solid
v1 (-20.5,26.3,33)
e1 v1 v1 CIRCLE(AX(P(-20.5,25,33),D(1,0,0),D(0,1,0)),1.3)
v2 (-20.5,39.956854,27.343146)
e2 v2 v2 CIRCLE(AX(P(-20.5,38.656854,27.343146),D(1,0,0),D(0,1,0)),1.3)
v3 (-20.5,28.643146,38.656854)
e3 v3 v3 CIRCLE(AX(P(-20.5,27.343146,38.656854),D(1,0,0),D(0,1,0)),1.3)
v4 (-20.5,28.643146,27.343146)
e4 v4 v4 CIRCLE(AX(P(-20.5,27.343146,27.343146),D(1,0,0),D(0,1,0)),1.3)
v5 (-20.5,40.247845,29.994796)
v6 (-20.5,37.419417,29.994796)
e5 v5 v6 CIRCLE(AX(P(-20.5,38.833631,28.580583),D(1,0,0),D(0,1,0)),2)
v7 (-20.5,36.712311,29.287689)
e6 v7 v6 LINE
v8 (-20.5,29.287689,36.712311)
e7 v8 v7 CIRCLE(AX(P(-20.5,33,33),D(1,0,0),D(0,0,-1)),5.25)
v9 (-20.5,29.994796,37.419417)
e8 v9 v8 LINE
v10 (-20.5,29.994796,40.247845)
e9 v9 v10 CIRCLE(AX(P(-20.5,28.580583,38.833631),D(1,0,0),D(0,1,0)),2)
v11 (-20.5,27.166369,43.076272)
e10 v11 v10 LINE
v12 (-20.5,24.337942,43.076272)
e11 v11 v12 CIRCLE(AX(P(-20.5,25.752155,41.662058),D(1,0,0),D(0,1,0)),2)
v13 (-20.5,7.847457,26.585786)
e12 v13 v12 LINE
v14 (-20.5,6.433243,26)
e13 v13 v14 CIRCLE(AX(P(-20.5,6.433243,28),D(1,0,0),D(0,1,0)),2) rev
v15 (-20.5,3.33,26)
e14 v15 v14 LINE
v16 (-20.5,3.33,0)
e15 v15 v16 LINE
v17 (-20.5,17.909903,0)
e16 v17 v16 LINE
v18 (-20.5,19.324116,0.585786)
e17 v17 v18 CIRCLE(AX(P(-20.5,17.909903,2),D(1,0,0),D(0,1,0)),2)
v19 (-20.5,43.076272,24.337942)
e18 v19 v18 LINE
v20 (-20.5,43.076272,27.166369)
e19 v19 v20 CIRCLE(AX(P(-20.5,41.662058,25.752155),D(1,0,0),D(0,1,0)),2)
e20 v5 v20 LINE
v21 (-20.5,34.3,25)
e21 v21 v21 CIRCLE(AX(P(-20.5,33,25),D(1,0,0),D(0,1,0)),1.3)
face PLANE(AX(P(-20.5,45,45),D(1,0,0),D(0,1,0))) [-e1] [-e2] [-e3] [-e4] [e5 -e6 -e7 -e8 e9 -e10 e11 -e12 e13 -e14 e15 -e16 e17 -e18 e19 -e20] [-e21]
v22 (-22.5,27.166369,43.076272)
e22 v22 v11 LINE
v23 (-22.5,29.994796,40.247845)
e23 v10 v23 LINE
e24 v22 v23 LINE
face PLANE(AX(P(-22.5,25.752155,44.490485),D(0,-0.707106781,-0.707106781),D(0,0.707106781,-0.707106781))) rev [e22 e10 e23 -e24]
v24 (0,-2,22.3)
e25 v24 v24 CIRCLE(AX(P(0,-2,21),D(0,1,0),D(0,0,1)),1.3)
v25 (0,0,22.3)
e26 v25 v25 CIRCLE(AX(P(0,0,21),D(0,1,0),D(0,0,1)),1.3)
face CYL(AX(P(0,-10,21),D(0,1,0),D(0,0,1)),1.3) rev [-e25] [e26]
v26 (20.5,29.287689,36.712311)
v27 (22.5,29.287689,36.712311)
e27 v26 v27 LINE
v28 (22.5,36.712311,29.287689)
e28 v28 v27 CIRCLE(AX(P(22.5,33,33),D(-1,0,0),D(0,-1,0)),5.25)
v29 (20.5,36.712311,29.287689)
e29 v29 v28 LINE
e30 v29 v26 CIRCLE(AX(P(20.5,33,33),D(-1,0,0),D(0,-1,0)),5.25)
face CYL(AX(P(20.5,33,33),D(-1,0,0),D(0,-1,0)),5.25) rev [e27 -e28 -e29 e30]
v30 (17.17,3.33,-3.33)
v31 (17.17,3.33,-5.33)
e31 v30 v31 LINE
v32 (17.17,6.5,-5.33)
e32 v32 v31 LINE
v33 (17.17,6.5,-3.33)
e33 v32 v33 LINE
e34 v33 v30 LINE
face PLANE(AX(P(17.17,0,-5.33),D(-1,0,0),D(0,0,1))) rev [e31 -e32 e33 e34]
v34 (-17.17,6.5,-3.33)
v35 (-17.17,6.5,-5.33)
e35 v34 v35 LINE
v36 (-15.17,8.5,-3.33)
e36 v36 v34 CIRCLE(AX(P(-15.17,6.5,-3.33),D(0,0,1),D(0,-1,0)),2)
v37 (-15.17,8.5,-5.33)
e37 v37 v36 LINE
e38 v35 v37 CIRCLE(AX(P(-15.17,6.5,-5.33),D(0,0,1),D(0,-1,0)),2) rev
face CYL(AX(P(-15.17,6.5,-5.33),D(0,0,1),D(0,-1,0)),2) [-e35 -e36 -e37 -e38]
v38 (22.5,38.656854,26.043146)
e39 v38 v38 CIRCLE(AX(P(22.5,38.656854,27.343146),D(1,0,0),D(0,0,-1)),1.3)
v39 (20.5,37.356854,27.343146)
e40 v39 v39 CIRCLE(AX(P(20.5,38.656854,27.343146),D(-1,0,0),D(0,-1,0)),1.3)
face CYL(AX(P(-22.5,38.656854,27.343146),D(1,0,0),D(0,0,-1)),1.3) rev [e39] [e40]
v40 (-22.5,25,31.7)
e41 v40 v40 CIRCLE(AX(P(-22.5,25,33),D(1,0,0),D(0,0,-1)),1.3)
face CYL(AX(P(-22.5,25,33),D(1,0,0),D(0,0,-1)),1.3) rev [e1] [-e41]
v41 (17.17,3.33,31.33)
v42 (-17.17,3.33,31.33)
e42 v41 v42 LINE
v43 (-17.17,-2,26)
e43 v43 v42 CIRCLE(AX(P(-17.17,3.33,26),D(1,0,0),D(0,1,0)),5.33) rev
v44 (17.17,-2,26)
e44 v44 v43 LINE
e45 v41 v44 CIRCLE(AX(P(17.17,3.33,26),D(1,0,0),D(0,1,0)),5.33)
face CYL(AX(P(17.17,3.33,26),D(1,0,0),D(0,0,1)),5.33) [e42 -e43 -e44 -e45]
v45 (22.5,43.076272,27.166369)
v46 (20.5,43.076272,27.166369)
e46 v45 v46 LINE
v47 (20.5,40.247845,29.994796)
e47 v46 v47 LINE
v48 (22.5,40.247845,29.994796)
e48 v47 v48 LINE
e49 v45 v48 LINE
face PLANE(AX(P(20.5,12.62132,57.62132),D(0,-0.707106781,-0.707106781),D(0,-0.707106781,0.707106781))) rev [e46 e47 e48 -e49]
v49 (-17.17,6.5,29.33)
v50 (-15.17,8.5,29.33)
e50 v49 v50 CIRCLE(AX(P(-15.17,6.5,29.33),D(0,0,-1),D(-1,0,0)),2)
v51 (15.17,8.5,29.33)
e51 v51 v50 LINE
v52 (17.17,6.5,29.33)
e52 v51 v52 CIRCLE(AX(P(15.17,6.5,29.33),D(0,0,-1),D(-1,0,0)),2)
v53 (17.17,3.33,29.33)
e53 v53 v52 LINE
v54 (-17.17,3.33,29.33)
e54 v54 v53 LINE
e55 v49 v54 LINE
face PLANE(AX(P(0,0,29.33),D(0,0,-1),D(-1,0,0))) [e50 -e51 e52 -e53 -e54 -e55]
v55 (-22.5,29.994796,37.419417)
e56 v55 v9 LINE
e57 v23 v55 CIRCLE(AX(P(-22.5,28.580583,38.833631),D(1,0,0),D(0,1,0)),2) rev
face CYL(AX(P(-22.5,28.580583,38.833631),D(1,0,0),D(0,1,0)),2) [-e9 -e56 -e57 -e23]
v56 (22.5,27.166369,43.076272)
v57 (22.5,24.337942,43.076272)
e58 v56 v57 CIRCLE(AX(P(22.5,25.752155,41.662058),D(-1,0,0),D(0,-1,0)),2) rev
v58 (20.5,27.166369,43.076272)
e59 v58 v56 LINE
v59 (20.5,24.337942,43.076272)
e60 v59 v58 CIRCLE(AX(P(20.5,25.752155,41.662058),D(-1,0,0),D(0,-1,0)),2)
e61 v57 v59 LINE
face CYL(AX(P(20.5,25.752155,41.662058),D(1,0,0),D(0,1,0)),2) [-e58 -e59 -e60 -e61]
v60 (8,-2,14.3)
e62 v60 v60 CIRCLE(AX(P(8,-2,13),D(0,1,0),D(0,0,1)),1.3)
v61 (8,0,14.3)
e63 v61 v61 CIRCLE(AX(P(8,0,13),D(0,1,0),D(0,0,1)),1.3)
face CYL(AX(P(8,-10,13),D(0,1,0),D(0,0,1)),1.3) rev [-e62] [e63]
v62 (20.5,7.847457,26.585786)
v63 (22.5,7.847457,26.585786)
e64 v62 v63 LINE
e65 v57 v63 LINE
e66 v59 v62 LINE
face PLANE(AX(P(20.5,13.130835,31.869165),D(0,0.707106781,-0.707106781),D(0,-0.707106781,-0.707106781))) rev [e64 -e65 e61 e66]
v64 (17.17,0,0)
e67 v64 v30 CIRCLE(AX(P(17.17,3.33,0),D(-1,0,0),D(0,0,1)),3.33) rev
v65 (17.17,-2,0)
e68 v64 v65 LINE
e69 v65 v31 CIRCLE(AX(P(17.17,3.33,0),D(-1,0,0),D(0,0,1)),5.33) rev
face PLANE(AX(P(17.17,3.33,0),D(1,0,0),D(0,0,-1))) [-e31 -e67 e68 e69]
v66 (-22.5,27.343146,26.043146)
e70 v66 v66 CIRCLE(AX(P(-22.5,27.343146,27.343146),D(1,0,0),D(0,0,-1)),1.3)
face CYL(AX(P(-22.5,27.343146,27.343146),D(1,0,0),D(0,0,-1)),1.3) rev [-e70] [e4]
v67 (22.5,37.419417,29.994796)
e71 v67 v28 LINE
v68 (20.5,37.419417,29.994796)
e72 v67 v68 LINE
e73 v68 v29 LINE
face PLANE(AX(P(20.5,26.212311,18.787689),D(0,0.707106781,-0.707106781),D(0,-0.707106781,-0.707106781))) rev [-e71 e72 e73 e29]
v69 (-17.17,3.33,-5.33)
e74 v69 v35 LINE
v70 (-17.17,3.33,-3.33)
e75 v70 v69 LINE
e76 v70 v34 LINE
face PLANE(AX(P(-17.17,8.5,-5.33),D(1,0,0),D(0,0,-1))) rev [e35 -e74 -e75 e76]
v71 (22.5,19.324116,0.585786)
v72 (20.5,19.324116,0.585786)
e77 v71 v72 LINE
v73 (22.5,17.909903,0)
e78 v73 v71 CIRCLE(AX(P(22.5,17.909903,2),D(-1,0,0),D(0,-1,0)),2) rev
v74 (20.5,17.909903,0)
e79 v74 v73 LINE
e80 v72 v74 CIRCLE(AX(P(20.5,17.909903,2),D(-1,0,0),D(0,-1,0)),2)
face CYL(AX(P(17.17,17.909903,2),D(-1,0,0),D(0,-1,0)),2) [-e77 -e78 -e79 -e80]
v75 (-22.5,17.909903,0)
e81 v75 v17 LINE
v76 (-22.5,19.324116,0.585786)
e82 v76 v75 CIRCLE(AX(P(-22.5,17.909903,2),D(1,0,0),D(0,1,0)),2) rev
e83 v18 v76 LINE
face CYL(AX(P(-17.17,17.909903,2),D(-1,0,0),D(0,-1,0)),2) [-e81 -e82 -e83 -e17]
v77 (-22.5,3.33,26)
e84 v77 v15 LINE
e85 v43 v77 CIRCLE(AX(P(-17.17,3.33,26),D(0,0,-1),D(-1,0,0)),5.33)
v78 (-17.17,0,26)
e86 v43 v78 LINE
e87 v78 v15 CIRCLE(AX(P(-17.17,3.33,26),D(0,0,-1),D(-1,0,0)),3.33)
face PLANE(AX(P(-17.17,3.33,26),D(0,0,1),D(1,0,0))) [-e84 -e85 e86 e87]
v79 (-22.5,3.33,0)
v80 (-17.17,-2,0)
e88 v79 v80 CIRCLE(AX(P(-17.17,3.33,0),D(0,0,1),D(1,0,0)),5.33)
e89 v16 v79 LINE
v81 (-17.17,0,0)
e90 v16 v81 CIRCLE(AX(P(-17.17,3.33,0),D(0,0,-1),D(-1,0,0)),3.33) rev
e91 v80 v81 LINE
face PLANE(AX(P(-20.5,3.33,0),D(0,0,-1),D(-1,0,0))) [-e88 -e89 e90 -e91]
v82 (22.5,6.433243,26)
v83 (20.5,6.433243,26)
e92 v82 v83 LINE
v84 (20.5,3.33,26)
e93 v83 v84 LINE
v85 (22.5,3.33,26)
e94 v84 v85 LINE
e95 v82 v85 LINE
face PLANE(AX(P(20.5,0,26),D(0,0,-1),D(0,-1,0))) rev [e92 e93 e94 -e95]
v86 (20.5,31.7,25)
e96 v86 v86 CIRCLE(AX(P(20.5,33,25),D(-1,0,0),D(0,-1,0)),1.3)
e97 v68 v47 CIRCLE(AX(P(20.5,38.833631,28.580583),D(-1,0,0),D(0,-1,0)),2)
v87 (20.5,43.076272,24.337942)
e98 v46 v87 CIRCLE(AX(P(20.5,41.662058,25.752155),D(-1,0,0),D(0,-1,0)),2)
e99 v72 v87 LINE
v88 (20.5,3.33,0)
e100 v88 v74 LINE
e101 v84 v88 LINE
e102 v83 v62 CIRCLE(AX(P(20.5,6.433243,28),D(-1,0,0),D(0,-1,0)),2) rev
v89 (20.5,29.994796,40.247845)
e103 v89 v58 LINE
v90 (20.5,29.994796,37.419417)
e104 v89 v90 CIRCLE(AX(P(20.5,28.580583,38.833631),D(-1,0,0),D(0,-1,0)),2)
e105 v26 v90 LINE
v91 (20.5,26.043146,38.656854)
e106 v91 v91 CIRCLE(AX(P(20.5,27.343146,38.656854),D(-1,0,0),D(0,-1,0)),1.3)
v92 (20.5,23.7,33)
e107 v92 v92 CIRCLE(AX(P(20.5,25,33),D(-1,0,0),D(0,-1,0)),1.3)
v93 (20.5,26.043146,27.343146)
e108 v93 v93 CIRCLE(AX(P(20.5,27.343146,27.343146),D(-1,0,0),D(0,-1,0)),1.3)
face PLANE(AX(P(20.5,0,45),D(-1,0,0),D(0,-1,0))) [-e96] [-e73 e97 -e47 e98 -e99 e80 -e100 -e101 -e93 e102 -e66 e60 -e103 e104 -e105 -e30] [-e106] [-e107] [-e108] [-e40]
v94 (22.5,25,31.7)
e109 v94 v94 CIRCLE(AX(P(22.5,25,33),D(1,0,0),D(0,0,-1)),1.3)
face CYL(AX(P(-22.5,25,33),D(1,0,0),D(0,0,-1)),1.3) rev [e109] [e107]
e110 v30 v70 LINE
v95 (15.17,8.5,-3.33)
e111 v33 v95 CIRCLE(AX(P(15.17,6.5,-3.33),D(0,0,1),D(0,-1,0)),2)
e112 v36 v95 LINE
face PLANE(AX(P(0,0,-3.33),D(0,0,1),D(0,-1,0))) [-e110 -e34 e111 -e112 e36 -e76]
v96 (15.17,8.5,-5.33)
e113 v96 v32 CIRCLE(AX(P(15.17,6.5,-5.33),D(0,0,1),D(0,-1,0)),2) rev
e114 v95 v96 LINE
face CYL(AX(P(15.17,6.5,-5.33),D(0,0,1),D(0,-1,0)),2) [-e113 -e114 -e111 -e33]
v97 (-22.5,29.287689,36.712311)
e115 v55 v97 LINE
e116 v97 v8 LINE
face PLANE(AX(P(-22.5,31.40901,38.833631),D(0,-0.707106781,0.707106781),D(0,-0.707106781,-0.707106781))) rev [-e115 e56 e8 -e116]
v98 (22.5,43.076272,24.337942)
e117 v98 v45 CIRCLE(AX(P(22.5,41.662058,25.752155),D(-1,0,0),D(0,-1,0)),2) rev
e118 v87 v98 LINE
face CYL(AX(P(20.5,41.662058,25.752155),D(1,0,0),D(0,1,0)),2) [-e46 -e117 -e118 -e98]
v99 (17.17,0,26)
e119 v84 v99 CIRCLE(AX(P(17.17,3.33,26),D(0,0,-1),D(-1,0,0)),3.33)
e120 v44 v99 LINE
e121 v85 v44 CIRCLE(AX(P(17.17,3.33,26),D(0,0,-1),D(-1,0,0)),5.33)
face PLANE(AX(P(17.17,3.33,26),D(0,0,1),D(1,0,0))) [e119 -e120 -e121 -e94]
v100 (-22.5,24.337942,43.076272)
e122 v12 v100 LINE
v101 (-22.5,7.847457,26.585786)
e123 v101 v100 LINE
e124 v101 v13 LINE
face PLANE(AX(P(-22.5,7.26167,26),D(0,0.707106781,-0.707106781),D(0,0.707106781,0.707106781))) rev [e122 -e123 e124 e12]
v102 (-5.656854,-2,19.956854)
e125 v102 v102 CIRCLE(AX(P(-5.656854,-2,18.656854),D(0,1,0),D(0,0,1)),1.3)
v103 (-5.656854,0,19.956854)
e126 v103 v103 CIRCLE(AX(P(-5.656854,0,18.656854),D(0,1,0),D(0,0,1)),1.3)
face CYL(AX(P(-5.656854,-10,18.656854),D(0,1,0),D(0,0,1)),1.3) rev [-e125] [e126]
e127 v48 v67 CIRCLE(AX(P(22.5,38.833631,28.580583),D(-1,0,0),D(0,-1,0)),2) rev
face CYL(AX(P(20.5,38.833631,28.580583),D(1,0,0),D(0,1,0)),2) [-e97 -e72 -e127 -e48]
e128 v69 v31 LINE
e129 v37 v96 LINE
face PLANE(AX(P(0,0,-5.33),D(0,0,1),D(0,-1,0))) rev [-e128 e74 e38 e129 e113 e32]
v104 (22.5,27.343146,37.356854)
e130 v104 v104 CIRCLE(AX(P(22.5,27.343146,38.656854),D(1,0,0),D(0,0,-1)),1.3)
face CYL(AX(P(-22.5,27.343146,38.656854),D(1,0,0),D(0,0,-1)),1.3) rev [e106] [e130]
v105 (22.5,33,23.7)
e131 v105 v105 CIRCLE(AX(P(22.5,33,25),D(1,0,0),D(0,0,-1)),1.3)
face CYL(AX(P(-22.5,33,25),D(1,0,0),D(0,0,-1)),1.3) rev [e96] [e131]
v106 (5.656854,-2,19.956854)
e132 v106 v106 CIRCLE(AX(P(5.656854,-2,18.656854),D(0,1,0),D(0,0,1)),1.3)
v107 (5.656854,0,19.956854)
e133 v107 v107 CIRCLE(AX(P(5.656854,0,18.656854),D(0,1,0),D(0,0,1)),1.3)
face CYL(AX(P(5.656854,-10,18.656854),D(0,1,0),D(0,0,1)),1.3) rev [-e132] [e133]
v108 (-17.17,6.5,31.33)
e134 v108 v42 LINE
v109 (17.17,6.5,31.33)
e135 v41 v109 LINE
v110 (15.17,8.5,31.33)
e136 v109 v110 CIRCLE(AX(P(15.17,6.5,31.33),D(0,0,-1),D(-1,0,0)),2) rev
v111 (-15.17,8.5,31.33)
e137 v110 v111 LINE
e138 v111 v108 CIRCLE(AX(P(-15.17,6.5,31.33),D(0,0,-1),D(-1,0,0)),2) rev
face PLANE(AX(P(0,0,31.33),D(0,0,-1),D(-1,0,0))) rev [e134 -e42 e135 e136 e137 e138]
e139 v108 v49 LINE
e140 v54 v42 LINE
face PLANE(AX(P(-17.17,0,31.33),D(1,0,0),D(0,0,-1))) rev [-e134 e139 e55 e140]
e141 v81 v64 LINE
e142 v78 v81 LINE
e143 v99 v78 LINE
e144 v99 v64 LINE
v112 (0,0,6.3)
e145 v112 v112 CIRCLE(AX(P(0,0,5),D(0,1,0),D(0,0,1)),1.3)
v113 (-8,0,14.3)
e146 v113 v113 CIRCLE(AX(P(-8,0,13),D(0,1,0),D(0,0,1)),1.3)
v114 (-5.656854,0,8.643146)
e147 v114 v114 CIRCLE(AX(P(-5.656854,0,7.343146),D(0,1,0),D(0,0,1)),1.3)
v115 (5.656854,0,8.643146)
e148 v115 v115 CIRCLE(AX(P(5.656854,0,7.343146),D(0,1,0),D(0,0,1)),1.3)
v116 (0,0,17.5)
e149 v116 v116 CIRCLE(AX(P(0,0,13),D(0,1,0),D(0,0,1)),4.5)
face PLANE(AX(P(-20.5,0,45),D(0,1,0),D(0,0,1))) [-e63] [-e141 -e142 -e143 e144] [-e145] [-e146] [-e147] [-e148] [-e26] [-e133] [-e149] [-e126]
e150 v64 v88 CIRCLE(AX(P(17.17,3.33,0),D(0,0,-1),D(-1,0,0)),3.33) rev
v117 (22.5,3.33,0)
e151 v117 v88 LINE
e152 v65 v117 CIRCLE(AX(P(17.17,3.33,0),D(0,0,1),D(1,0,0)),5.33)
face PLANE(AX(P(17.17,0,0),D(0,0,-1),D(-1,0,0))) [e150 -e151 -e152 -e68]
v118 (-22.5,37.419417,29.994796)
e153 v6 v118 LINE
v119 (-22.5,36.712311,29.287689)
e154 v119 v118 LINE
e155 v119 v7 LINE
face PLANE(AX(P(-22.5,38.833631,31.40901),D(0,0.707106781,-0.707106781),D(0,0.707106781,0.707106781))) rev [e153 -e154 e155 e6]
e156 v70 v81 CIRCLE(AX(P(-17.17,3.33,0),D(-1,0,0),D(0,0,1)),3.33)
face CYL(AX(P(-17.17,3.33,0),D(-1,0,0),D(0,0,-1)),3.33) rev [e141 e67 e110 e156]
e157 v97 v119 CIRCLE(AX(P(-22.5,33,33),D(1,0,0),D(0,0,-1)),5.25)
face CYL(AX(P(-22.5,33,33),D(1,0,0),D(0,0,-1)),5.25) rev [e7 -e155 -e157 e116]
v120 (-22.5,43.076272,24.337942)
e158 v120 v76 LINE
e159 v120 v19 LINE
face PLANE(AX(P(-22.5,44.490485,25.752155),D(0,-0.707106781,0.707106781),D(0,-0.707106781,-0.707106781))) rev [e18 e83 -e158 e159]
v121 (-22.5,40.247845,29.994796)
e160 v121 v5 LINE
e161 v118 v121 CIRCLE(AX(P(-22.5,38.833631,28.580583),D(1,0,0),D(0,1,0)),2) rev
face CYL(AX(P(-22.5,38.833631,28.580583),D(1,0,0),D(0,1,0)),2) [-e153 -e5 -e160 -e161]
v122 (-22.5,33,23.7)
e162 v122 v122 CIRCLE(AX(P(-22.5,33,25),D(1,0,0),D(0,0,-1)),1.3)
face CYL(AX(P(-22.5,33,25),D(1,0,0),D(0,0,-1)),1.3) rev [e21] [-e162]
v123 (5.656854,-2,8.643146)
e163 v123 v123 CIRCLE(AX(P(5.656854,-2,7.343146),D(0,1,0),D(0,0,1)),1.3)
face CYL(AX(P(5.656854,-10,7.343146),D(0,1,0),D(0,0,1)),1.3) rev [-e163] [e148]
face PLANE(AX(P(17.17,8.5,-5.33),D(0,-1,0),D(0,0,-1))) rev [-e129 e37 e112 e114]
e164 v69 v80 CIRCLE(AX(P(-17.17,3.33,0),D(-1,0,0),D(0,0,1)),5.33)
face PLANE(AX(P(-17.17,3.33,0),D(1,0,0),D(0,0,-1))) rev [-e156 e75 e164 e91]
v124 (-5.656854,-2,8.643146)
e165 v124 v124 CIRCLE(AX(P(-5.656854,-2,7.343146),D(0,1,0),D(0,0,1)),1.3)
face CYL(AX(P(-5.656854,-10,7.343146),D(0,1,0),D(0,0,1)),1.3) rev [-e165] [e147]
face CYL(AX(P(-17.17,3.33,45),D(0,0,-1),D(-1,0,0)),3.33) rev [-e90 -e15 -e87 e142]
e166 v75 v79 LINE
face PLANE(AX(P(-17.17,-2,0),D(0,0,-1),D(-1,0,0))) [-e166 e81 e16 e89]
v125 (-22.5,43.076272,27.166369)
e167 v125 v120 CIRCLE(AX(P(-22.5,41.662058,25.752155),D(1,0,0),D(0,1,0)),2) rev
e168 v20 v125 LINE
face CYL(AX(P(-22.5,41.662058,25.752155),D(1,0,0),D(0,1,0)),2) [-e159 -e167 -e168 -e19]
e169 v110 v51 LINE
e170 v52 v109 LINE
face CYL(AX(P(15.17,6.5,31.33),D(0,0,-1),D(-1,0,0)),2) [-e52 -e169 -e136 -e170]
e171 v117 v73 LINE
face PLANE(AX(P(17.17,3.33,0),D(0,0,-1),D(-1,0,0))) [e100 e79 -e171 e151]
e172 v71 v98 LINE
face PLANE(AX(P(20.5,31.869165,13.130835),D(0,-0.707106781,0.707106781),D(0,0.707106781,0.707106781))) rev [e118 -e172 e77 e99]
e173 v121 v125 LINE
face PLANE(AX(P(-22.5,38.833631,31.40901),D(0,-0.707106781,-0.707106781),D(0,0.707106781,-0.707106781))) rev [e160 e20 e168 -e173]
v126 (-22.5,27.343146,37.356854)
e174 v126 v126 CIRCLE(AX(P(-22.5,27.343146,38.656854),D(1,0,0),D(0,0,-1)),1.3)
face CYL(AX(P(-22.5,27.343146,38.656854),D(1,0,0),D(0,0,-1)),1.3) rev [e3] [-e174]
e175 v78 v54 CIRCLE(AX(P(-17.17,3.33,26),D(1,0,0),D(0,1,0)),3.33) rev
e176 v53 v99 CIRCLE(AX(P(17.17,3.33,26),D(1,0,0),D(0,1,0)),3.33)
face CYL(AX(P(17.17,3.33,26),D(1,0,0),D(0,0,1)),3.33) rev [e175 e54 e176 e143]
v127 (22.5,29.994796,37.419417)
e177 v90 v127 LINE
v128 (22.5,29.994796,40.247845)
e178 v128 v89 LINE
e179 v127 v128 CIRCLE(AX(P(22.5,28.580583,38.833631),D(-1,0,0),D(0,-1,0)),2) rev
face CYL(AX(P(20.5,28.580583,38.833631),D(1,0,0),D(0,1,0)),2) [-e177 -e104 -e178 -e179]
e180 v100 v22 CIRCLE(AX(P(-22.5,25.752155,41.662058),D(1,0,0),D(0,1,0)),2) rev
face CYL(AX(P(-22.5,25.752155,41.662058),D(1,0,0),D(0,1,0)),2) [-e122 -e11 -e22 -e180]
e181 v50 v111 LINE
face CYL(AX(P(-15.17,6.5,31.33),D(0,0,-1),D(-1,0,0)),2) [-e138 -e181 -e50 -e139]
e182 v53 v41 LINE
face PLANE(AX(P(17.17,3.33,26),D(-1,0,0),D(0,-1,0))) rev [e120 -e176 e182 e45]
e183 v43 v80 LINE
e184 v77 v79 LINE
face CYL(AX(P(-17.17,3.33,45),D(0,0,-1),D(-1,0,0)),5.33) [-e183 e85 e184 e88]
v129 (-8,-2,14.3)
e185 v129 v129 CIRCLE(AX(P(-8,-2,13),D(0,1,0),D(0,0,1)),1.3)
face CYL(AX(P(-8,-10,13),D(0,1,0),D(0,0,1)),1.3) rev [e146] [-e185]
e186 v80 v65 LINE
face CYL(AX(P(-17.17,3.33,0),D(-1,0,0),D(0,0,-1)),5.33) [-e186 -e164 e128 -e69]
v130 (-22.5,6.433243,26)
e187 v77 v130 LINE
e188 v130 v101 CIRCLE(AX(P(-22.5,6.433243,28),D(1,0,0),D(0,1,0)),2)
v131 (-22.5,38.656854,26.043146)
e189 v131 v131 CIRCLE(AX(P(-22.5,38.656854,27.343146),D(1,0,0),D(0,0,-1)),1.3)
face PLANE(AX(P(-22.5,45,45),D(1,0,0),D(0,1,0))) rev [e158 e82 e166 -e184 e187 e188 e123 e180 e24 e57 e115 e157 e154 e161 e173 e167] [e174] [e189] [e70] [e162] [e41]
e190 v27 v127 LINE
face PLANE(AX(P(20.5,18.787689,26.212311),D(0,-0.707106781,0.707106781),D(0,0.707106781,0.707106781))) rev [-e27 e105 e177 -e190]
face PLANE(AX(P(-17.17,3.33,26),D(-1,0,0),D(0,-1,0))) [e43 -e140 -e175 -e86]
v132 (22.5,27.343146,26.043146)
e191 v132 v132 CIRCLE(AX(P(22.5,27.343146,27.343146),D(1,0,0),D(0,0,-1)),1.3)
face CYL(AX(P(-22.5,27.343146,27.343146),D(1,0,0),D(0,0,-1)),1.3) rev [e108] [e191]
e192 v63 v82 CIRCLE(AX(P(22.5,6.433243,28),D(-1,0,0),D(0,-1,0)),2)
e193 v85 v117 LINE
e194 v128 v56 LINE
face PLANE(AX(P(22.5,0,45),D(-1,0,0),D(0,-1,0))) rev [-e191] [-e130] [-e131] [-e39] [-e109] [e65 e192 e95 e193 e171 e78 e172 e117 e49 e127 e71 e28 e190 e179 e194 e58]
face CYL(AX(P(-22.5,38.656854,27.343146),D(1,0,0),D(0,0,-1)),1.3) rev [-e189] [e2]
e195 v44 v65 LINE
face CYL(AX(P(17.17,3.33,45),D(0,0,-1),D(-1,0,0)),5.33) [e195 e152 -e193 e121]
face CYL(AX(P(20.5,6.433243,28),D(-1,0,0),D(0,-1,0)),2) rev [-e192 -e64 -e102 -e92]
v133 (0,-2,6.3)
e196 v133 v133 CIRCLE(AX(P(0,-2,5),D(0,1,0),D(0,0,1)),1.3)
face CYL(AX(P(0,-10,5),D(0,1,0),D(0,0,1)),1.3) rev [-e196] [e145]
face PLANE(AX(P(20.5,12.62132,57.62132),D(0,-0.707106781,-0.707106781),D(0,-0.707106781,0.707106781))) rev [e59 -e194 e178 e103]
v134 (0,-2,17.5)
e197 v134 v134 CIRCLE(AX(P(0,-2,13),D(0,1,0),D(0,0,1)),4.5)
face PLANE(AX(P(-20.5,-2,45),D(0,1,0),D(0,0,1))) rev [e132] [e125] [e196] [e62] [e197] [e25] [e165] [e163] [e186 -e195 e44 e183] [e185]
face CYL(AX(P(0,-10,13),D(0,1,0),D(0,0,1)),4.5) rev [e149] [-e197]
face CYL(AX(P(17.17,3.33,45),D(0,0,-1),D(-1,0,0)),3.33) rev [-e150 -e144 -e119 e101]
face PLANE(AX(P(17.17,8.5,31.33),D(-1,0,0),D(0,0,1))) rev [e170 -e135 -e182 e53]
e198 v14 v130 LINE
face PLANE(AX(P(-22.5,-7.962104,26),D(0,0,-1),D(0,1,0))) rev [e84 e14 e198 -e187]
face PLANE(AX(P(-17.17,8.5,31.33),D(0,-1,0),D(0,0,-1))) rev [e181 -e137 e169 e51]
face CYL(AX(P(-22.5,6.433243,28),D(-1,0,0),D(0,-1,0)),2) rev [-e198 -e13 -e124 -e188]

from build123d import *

# Parameters (mm, degrees)
BASE_FLANGE1_DEPTH      = 45
SKETCH5_R               = 4.5
SKETCH5_R_2             = 1.3
CUT_EXTRUDE1_DEPTH      = 10
CUT_EXTRUDE5_DEPTH      = 68.5
CUT_EXTRUDE5_DEPTH_BACK = 68.5
CUT_EXTRUDE6_DEPTH      = 67.821078603
CUT_EXTRUDE6_DEPTH_BACK = 67.821078603
SKETCH9_R               = 1.3
FILLET1_R               = 2
EDGE_FLANGE2_DEPTH      = 34.34
EDGE_FLANGE3_DEPTH      = 34.34
FILLET2_R               = 2


# Sheet-metal steps are written as plain solids
with BuildPart() as part:
    # Sketch1 → Base-Flange1 (new body)
    with BuildSketch(Plane.XY):
        with BuildLine():
            Line((-20.5, 45), (-20.5, 3.33))
            ThreePointArc((-20.5, 3.33), (-19.524665581, 0.975334419), (-17.17, 0))
            Line((-17.17, 0), (17.17, 0))
            ThreePointArc((17.17, 0), (19.524665581, 0.975334419), (20.5, 3.33))
            Line((20.5, 3.33), (20.5, 45))
            Line((20.5, 45), (22.5, 45))
            Line((22.5, 45), (22.5, 3.33))
            ThreePointArc((22.5, 3.33), (20.938879144, -0.438879144), (17.17, -2))
            Line((17.17, -2), (-17.17, -2))
            ThreePointArc((-17.17, -2), (-20.938879144, -0.438879144), (-22.5, 3.33))
            Line((-22.5, 3.33), (-22.5, 45))
            Line((-22.5, 45), (-20.5, 45))
        make_face()
    extrude(amount=BASE_FLANGE1_DEPTH)

    # Sketch5 → Cut-Extrude1 (cut)
    with BuildSketch(Plane(origin=(0, 0, 0), x_dir=(-1, 0, 0), z_dir=(0, 1, 0))):
        with Locations(Location((0, 13, 0), (0, 0, 90))):
            Circle(SKETCH5_R)
        with Locations(Location((0, 5, 0), (0, 0, 90))):
            Circle(SKETCH5_R_2)
        with Locations(Location((-5.656854249, 7.343145751, 0), (0, 0, 90))):
            Circle(SKETCH5_R_2)
        with Locations(Location((-8, 13, 0), (0, 0, 90))):
            Circle(SKETCH5_R_2)
        with Locations(Location((-5.656854249, 18.656854249, 0), (0, 0, 90))):
            Circle(SKETCH5_R_2)
        with Locations(Location((0, 21, 0), (0, 0, 90))):
            Circle(SKETCH5_R_2)
        with Locations(Location((5.656854249, 18.656854249, 0), (0, 0, 90))):
            Circle(SKETCH5_R_2)
        with Locations(Location((8, 13, 0), (0, 0, 90))):
            Circle(SKETCH5_R_2)
        with Locations(Location((5.656854249, 7.343145751, 0), (0, 0, 90))):
            Circle(SKETCH5_R_2)
    extrude(amount=-CUT_EXTRUDE1_DEPTH, mode=Mode.SUBTRACT)

    # Sketch8 → Cut-Extrude5 (cut, two sides: drawn at the far end of the back side and taken through both)
    with BuildSketch(Plane(origin=(0, 0, 0), x_dir=(0, 0, -1), z_dir=(1, 0, 0)).offset(-CUT_EXTRUDE5_DEPTH_BACK)):
        with BuildLine():
            Line((-44.490485194, 25.752155493), (-38.833630945, 31.409009742))
            Line((-38.833630945, 31.409009742), (-36.712310601, 29.287689399))
            ThreePointArc((-36.712310601, 29.287689399), (-29.287689399, 29.287689399), (-29.287689399, 36.712310601))
            Line((-29.287689399, 36.712310601), (-31.409009742, 38.833630945))
            Line((-31.409009742, 38.833630945), (-25.752155493, 44.490485194))
            Line((-25.752155493, 44.490485194), (0, 18.738329701))
            Line((0, 18.738329701), (0, 54.044936655))
            Line((0, 54.044936655), (-47.344215892, 54.044936655))
            Line((-47.344215892, 54.044936655), (-47.344215892, -7.96210432))
            Line((-47.344215892, -7.96210432), (-26, -7.96210432))
            Line((-26, -7.96210432), (-26, 7.261670299))
            Line((-26, 7.261670299), (-44.490485194, 25.752155493))
        make_face()
    extrude(amount=CUT_EXTRUDE5_DEPTH + CUT_EXTRUDE5_DEPTH_BACK, mode=Mode.SUBTRACT)

    # Sketch9 → Cut-Extrude6 (cut, two sides: drawn at the far end of the back side and taken through both)
    with BuildSketch(Plane(origin=(0, 0, 0), x_dir=(0, 0, -1), z_dir=(1, 0, 0)).offset(-CUT_EXTRUDE6_DEPTH_BACK)):
        with Locations((-38.656854249, 27.343145751)):
            Circle(SKETCH9_R)
        with Locations((-41, 33)):
            Circle(SKETCH9_R)
        with Locations((-38.656854249, 38.656854249)):
            Circle(SKETCH9_R)
        with Locations((-33, 41)):
            Circle(SKETCH9_R)
        with Locations((-27.343145751, 38.656854249)):
            Circle(SKETCH9_R)
        with Locations((-25, 33)):
            Circle(SKETCH9_R)
        with Locations((-27.343145751, 27.343145751)):
            Circle(SKETCH9_R)
        with Locations((-33, 25)):
            Circle(SKETCH9_R)
    extrude(amount=CUT_EXTRUDE6_DEPTH + CUT_EXTRUDE6_DEPTH_BACK, mode=Mode.SUBTRACT)

    # Fillet1
    fillet1_edges = [part.edges().sort_by_distance(p)[0] for p in [
        (21.5, 18.738329701, 0),
        (21.5, 44.490485194, 25.752155493),
        (21.5, 38.833630945, 31.409009742),
        (21.5, 31.409009742, 38.833630945),
        (21.5, 25.752155493, 44.490485194),
        (21.5, 7.261670299, 26),
        (-21.5, 18.738329701, 0),
        (-21.5, 44.490485194, 25.752155493),
        (-21.5, 38.833630945, 31.409009742),
        (-21.5, 31.409009742, 38.833630945),
        (-21.5, 25.752155493, 44.490485194),
        (-21.5, 7.261670299, 26),
    ]]
    fillet(fillet1_edges, radius=FILLET1_R)

    # Edge-Flange2 section (across the edge) → Edge-Flange2 (add)
    with BuildSketch(Plane(origin=(-17.17, 0, 29.33), x_dir=(0, 0, -1), z_dir=(1, 0, 0))):
        with BuildLine():
            Line((-2, 3.33), (-2, 8.5))
            Line((-2, 8.5), (0, 8.5))
            Line((0, 8.5), (0, 3.33))
            ThreePointArc((0, 3.33), (0.975334419, 0.975334419), (3.33, 0))
            Line((3.33, 0), (3.33, -2))
            ThreePointArc((3.33, -2), (-0.438879144, -0.438879144), (-2, 3.33))
        make_face()
    extrude(amount=EDGE_FLANGE2_DEPTH)

    # Edge-Flange3 section (across the edge) → Edge-Flange3 (add)
    with BuildSketch(Plane(origin=(17.17, 0, -3.33), x_dir=(0, 0, 1), z_dir=(-1, 0, 0))):
        with BuildLine():
            Line((-2, 3.33), (-2, 8.5))
            Line((-2, 8.5), (0, 8.5))
            Line((0, 8.5), (0, 3.33))
            ThreePointArc((0, 3.33), (0.975334419, 0.975334419), (3.33, 0))
            Line((3.33, 0), (3.33, -2))
            ThreePointArc((3.33, -2), (-0.438879144, -0.438879144), (-2, 3.33))
        make_face()
    extrude(amount=EDGE_FLANGE3_DEPTH)

    # Fillet2
    fillet2_edges = [part.edges().sort_by_distance(p)[0] for p in [
        (-17.17, 8.5, 30.33),
        (17.17, 8.5, 30.33),
        (17.17, 8.5, -4.33),
        (-17.17, 8.5, -4.33),
    ]]
    fillet(fillet2_edges, radius=FILLET2_R)


solid = part.part
